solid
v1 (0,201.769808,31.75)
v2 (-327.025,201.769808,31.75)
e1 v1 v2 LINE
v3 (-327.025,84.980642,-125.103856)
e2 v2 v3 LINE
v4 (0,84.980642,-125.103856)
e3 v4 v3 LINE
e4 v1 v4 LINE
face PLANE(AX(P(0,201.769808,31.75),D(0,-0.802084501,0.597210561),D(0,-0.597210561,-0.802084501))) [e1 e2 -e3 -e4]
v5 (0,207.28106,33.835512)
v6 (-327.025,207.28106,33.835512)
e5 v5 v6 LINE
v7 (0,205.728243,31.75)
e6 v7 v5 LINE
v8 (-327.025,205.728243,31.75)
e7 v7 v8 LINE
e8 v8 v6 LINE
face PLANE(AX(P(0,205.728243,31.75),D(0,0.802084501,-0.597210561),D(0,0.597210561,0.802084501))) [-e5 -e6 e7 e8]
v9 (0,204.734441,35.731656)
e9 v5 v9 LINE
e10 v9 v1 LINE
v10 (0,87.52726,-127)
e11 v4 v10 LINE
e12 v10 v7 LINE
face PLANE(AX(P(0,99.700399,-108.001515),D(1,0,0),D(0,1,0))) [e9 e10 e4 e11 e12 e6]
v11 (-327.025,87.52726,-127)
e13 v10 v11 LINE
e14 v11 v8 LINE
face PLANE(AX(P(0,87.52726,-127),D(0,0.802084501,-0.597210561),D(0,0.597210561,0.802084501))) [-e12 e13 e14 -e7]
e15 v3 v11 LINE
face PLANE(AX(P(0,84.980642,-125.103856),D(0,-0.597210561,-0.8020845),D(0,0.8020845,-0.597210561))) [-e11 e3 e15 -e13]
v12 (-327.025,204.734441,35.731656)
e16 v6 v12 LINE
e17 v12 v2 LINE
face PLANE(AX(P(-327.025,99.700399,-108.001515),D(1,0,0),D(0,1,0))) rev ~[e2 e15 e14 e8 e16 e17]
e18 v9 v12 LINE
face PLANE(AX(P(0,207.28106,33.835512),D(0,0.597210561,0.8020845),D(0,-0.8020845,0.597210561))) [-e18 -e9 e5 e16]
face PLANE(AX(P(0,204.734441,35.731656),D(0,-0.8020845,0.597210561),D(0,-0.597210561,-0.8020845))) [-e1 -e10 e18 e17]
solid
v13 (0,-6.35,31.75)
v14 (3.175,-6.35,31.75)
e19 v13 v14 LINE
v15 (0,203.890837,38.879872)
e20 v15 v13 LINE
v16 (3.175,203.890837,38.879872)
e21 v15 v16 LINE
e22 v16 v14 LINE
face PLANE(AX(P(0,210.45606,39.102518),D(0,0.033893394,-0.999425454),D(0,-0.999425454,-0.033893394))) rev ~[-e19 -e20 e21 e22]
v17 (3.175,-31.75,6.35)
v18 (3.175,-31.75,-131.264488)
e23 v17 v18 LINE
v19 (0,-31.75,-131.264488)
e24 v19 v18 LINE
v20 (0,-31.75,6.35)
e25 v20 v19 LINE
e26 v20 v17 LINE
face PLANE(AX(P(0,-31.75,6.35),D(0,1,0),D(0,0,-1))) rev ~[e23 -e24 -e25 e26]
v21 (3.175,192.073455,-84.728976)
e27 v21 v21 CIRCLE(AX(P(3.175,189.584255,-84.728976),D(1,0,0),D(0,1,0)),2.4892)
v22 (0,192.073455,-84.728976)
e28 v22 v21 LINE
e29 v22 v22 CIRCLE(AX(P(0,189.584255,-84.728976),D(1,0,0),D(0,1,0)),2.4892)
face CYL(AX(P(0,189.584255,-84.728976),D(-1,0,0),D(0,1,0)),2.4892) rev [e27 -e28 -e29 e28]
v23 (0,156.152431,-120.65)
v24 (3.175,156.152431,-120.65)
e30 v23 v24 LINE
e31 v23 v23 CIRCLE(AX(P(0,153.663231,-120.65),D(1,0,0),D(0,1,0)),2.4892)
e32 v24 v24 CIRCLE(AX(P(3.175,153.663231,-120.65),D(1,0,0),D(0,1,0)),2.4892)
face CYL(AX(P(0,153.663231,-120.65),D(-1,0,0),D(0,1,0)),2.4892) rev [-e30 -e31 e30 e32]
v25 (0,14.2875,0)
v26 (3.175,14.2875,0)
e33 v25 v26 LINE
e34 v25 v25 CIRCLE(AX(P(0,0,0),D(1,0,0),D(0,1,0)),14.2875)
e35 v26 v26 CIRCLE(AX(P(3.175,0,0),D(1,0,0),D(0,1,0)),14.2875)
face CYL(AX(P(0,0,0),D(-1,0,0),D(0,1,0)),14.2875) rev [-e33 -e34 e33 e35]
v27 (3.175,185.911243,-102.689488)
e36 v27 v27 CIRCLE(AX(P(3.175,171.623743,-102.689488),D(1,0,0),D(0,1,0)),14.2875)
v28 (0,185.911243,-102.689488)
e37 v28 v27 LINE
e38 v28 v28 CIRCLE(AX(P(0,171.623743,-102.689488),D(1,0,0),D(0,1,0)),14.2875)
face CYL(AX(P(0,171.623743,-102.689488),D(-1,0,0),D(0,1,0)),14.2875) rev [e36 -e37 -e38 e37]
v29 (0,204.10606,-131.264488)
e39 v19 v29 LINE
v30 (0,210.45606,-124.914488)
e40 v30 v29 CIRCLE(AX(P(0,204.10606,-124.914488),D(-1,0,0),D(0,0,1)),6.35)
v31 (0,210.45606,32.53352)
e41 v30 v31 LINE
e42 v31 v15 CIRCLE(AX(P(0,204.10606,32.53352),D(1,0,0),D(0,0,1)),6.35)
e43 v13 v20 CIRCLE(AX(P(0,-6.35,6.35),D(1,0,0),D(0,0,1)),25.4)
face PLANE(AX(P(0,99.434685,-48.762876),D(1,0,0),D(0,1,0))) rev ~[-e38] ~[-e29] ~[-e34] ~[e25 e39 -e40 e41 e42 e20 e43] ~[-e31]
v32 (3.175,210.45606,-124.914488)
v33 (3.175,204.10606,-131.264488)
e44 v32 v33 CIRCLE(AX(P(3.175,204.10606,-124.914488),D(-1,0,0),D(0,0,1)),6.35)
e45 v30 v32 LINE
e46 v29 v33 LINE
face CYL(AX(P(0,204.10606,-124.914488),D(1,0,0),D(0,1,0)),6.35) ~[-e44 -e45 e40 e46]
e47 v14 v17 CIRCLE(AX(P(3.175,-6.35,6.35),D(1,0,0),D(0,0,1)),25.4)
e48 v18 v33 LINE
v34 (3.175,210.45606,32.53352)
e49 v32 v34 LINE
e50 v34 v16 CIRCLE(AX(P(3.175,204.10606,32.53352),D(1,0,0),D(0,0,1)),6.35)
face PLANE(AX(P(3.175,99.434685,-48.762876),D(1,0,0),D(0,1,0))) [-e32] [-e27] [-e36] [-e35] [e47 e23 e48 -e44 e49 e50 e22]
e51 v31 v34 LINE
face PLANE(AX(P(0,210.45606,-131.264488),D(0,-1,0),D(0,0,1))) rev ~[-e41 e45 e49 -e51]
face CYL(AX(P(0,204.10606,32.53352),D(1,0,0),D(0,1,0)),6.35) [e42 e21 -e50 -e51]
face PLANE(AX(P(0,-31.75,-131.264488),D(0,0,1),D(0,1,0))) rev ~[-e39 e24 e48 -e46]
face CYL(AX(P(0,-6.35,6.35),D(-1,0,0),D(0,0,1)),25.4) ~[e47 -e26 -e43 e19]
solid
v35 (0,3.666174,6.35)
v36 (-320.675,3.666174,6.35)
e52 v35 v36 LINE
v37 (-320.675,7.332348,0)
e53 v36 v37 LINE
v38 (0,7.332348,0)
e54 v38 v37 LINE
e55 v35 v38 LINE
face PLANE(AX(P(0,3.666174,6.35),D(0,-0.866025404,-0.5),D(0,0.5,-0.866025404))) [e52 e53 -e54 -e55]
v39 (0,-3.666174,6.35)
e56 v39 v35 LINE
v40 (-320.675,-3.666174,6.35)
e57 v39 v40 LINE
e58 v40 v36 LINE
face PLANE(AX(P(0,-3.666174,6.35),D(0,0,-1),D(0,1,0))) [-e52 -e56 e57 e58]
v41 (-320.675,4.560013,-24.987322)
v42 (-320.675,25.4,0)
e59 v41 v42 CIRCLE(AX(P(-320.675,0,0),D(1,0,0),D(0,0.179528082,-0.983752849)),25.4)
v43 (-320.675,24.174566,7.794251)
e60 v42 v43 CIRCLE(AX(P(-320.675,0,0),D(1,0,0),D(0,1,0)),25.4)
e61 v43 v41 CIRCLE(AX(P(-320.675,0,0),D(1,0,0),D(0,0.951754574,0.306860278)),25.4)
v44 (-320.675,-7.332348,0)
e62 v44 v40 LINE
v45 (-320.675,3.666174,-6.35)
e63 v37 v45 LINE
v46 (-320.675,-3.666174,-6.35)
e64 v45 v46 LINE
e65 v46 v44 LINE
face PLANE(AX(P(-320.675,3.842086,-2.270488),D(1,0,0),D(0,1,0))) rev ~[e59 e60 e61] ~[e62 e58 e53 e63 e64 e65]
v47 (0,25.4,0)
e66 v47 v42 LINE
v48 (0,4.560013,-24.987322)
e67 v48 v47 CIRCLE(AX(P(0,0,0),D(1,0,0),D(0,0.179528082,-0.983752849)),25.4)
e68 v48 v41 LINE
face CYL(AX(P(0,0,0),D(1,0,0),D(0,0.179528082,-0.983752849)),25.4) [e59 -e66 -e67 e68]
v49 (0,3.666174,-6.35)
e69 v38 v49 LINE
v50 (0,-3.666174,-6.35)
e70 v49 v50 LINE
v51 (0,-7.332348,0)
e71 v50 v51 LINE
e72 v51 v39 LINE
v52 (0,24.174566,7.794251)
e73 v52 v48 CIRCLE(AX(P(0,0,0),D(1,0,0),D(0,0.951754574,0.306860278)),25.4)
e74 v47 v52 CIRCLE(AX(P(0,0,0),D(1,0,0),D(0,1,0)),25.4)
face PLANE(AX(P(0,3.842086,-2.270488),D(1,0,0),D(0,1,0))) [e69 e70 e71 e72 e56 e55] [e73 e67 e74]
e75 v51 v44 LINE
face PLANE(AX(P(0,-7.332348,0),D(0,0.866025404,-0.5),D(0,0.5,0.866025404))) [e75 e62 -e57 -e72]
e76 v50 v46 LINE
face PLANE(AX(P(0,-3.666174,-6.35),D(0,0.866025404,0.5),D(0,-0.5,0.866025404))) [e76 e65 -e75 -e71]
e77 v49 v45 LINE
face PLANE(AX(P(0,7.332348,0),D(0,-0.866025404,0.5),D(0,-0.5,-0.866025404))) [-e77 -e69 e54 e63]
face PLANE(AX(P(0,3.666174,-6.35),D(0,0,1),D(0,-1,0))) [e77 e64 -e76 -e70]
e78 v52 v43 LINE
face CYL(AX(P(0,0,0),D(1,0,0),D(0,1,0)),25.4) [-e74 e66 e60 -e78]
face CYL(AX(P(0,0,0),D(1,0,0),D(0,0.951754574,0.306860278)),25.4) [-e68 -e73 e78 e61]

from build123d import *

# Parameters (mm, degrees)
F0_R     = 2.4892
F0_R_2   = 14.2875
F1_DEPTH = 3.175
F2_DEPTH = 320.675
F3_DEPTH = 327.025
F5_R     = 6.35


# Not quite as in the source:
# - the program builds the solid bodies; features that only make, move or delete a surface that nothing else refers to are left out


with BuildPart() as f1:
    # F0 (on Right) → F1 (new body)
    with BuildSketch(Plane.YZ):
        with BuildLine():
            ThreePointArc((4.5600132785, -24.9873223635), (-21.7962589324, 13.0415910284), (24.1745661853, 7.7942510707))
            Line((24.1745661853, 7.7942510707), (134.6951456058, -58.3347209468))
            Line((134.6951456058, -58.3347209468), (201.7698075546, 31.75))
            Line((201.7698075546, 31.75), (-6.35, 31.75))
            ThreePointArc((-6.35, 31.75), (-24.3105122421, 24.3105122421), (-31.75, 6.35))
            Line((-31.75, 6.35), (-31.75, -131.2644877579))
            Line((-31.75, -131.2644877579), (210.4560597146, -131.2644877579))
            Line((210.4560597146, -131.2644877579), (210.4560597146, 31.75))
            Line((210.4560597146, 31.75), (205.7282433529, 31.75))
            Line((205.7282433529, 31.75), (137.4335839182, -59.9732403202))
            Line((137.4335839182, -59.9732403202), (181.4310192869, -86.2987010407))
            ThreePointArc((181.4310192869, -86.2987010407), (188.0145295507, -112.4967642112), (161.8164663801, -119.080274475))
            Line((161.8164663801, -119.080274475), (114.5027408261, -90.7705420286))
            Line((114.5027408261, -90.7705420286), (87.5272601843, -127))
            Line((87.5272601843, -127), (84.9806418952, -125.1038564691))
            Line((84.9806418952, -125.1038564691), (111.7643025136, -89.1320226553))
            Line((111.7643025136, -89.1320226553), (4.5600132785, -24.9873223635))
        make_face()
        with Locations((153.6632305914, -120.65)):
            Circle(F0_R, mode=Mode.SUBTRACT)
        with Locations((189.5842550757, -84.7289755157)):
            Circle(F0_R, mode=Mode.SUBTRACT)
        with BuildLine():
            ThreePointArc((24.1745661853, 7.7942510707), (25.0917713714, 3.9449980288), (25.4, 0))
            ThreePointArc((25.4, 0), (19.5062084639, -16.2686149184), (4.5600132785, -24.9873223635))
            Line((4.5600132785, -24.9873223635), (111.7643025136, -89.1320226553))
            Line((111.7643025136, -89.1320226553), (134.6951456058, -58.3347209468))
            Line((134.6951456058, -58.3347209468), (24.1745661853, 7.7942510707))
        make_face()
        with BuildLine():
            Line((9.8072764534, 16.3907867171), (24.1745661853, 7.7942510707))
            ThreePointArc((24.1745661853, 7.7942510707), (-21.7962589324, 13.0415910284), (4.5600132785, -24.9873223635))
            Line((4.5600132785, -24.9873223635), (-9.8072764534, -16.3907867171))
            ThreePointArc((-9.8072764534, -16.3907867171), (-16.3907867171, 9.8072764534), (9.8072764534, 16.3907867171))
        make_face()
        with BuildLine():
            ThreePointArc((4.5600132785, -24.9873223635), (19.5062084639, -16.2686149184), (25.4, 0))
            ThreePointArc((25.4, 0), (25.0917713714, 3.9449980288), (24.1745661853, 7.7942510707))
            Line((24.1745661853, 7.7942510707), (9.8072764534, 16.3907867171))
            ThreePointArc((9.8072764534, 16.3907867171), (-16.3907867171, 9.8072764534), (-9.8072764534, -16.3907867171))
            Line((-9.8072764534, -16.3907867171), (4.5600132785, -24.9873223635))
        make_face()
        Circle(F0_R_2, mode=Mode.SUBTRACT)
        Polygon((114.5027408261, -90.7705420286), (111.7643025136, -89.1320226553), (84.9806418952, -125.1038564691), (87.5272601843, -127), align=None)
        Polygon((137.4335839182, -59.9732403202), (134.6951456058, -58.3347209468), (111.7643025136, -89.1320226553), (114.5027408261, -90.7705420286), align=None)
        Polygon((201.7698075546, 31.75), (134.6951456058, -58.3347209468), (137.4335839182, -59.9732403202), (205.7282433529, 31.75), align=None)
        Polygon((204.7344414256, 35.731655773), (201.7698075546, 31.75), (205.7282433529, 31.75), (207.2810597146, 33.8355122421), align=None)
        with BuildLine():
            Line((181.4310192869, -86.2987010407), (137.4335839182, -59.9732403202))
            Line((137.4335839182, -59.9732403202), (114.5027408261, -90.7705420286))
            Line((114.5027408261, -90.7705420286), (161.8164663801, -119.080274475))
            ThreePointArc((161.8164663801, -119.080274475), (188.0145295507, -112.4967642112), (181.4310192869, -86.2987010407))
        make_face()
        with Locations((171.6237428335, -102.6894877579)):
            Circle(F0_R_2, mode=Mode.SUBTRACT)
        Polygon((-6.35, 31.75), (201.7698075546, 31.75), (204.7344414256, 35.731655773), (207.2810597146, 33.8355122421), (205.7282433529, 31.75), (210.4560597146, 31.75), (210.4560597146, 39.1025175512), align=None)
    extrude(amount=F1_DEPTH)

    # F5
    f5_edges = [f1.edges().sort_by_distance(p)[0] for p in [
        (1.5875, -6.35, 31.75),
        (1.5875, 210.45606, -131.264488),
        (1.5875, 210.45606, 39.102518),
    ]]
    fillet(f5_edges, radius=F5_R)


with BuildPart() as f2:
    # F0 (on Right) → F2 (new body)
    with BuildSketch(Plane.YZ):
        with BuildLine():
            ThreePointArc((4.5600132785, -24.9873223635), (19.5062084639, -16.2686149184), (25.4, 0))
            ThreePointArc((25.4, 0), (25.0917713714, 3.9449980288), (24.1745661853, 7.7942510707))
            Line((24.1745661853, 7.7942510707), (9.8072764534, 16.3907867171))
            ThreePointArc((9.8072764534, 16.3907867171), (-16.3907867171, 9.8072764534), (-9.8072764534, -16.3907867171))
            Line((-9.8072764534, -16.3907867171), (4.5600132785, -24.9873223635))
        make_face()
        Circle(F0_R_2, mode=Mode.SUBTRACT)
        Circle(F0_R_2)
        Polygon((-7.3323484187, 0), (-3.6661742094, 6.35), (3.6661742094, 6.35), (7.3323484187, 0), (3.6661742094, -6.35), (-3.6661742094, -6.35), align=None, mode=Mode.SUBTRACT)
        with BuildLine():
            Line((9.8072764534, 16.3907867171), (24.1745661853, 7.7942510707))
            ThreePointArc((24.1745661853, 7.7942510707), (-21.7962589324, 13.0415910284), (4.5600132785, -24.9873223635))
            Line((4.5600132785, -24.9873223635), (-9.8072764534, -16.3907867171))
            ThreePointArc((-9.8072764534, -16.3907867171), (-16.3907867171, 9.8072764534), (9.8072764534, 16.3907867171))
        make_face()
    extrude(amount=-F2_DEPTH)


with BuildPart() as f3:
    # F0 (on Right) → F3 (new body)
    with BuildSketch(Plane.YZ):
        Polygon((114.5027408261, -90.7705420286), (111.7643025136, -89.1320226553), (84.9806418952, -125.1038564691), (87.5272601843, -127), align=None)
        Polygon((137.4335839182, -59.9732403202), (134.6951456058, -58.3347209468), (111.7643025136, -89.1320226553), (114.5027408261, -90.7705420286), align=None)
        Polygon((201.7698075546, 31.75), (134.6951456058, -58.3347209468), (137.4335839182, -59.9732403202), (205.7282433529, 31.75), align=None)
        Polygon((204.7344414256, 35.731655773), (201.7698075546, 31.75), (205.7282433529, 31.75), (207.2810597146, 33.8355122421), align=None)
    extrude(amount=-F3_DEPTH)


solid = Compound([f1.part, f2.part, f3.part])
